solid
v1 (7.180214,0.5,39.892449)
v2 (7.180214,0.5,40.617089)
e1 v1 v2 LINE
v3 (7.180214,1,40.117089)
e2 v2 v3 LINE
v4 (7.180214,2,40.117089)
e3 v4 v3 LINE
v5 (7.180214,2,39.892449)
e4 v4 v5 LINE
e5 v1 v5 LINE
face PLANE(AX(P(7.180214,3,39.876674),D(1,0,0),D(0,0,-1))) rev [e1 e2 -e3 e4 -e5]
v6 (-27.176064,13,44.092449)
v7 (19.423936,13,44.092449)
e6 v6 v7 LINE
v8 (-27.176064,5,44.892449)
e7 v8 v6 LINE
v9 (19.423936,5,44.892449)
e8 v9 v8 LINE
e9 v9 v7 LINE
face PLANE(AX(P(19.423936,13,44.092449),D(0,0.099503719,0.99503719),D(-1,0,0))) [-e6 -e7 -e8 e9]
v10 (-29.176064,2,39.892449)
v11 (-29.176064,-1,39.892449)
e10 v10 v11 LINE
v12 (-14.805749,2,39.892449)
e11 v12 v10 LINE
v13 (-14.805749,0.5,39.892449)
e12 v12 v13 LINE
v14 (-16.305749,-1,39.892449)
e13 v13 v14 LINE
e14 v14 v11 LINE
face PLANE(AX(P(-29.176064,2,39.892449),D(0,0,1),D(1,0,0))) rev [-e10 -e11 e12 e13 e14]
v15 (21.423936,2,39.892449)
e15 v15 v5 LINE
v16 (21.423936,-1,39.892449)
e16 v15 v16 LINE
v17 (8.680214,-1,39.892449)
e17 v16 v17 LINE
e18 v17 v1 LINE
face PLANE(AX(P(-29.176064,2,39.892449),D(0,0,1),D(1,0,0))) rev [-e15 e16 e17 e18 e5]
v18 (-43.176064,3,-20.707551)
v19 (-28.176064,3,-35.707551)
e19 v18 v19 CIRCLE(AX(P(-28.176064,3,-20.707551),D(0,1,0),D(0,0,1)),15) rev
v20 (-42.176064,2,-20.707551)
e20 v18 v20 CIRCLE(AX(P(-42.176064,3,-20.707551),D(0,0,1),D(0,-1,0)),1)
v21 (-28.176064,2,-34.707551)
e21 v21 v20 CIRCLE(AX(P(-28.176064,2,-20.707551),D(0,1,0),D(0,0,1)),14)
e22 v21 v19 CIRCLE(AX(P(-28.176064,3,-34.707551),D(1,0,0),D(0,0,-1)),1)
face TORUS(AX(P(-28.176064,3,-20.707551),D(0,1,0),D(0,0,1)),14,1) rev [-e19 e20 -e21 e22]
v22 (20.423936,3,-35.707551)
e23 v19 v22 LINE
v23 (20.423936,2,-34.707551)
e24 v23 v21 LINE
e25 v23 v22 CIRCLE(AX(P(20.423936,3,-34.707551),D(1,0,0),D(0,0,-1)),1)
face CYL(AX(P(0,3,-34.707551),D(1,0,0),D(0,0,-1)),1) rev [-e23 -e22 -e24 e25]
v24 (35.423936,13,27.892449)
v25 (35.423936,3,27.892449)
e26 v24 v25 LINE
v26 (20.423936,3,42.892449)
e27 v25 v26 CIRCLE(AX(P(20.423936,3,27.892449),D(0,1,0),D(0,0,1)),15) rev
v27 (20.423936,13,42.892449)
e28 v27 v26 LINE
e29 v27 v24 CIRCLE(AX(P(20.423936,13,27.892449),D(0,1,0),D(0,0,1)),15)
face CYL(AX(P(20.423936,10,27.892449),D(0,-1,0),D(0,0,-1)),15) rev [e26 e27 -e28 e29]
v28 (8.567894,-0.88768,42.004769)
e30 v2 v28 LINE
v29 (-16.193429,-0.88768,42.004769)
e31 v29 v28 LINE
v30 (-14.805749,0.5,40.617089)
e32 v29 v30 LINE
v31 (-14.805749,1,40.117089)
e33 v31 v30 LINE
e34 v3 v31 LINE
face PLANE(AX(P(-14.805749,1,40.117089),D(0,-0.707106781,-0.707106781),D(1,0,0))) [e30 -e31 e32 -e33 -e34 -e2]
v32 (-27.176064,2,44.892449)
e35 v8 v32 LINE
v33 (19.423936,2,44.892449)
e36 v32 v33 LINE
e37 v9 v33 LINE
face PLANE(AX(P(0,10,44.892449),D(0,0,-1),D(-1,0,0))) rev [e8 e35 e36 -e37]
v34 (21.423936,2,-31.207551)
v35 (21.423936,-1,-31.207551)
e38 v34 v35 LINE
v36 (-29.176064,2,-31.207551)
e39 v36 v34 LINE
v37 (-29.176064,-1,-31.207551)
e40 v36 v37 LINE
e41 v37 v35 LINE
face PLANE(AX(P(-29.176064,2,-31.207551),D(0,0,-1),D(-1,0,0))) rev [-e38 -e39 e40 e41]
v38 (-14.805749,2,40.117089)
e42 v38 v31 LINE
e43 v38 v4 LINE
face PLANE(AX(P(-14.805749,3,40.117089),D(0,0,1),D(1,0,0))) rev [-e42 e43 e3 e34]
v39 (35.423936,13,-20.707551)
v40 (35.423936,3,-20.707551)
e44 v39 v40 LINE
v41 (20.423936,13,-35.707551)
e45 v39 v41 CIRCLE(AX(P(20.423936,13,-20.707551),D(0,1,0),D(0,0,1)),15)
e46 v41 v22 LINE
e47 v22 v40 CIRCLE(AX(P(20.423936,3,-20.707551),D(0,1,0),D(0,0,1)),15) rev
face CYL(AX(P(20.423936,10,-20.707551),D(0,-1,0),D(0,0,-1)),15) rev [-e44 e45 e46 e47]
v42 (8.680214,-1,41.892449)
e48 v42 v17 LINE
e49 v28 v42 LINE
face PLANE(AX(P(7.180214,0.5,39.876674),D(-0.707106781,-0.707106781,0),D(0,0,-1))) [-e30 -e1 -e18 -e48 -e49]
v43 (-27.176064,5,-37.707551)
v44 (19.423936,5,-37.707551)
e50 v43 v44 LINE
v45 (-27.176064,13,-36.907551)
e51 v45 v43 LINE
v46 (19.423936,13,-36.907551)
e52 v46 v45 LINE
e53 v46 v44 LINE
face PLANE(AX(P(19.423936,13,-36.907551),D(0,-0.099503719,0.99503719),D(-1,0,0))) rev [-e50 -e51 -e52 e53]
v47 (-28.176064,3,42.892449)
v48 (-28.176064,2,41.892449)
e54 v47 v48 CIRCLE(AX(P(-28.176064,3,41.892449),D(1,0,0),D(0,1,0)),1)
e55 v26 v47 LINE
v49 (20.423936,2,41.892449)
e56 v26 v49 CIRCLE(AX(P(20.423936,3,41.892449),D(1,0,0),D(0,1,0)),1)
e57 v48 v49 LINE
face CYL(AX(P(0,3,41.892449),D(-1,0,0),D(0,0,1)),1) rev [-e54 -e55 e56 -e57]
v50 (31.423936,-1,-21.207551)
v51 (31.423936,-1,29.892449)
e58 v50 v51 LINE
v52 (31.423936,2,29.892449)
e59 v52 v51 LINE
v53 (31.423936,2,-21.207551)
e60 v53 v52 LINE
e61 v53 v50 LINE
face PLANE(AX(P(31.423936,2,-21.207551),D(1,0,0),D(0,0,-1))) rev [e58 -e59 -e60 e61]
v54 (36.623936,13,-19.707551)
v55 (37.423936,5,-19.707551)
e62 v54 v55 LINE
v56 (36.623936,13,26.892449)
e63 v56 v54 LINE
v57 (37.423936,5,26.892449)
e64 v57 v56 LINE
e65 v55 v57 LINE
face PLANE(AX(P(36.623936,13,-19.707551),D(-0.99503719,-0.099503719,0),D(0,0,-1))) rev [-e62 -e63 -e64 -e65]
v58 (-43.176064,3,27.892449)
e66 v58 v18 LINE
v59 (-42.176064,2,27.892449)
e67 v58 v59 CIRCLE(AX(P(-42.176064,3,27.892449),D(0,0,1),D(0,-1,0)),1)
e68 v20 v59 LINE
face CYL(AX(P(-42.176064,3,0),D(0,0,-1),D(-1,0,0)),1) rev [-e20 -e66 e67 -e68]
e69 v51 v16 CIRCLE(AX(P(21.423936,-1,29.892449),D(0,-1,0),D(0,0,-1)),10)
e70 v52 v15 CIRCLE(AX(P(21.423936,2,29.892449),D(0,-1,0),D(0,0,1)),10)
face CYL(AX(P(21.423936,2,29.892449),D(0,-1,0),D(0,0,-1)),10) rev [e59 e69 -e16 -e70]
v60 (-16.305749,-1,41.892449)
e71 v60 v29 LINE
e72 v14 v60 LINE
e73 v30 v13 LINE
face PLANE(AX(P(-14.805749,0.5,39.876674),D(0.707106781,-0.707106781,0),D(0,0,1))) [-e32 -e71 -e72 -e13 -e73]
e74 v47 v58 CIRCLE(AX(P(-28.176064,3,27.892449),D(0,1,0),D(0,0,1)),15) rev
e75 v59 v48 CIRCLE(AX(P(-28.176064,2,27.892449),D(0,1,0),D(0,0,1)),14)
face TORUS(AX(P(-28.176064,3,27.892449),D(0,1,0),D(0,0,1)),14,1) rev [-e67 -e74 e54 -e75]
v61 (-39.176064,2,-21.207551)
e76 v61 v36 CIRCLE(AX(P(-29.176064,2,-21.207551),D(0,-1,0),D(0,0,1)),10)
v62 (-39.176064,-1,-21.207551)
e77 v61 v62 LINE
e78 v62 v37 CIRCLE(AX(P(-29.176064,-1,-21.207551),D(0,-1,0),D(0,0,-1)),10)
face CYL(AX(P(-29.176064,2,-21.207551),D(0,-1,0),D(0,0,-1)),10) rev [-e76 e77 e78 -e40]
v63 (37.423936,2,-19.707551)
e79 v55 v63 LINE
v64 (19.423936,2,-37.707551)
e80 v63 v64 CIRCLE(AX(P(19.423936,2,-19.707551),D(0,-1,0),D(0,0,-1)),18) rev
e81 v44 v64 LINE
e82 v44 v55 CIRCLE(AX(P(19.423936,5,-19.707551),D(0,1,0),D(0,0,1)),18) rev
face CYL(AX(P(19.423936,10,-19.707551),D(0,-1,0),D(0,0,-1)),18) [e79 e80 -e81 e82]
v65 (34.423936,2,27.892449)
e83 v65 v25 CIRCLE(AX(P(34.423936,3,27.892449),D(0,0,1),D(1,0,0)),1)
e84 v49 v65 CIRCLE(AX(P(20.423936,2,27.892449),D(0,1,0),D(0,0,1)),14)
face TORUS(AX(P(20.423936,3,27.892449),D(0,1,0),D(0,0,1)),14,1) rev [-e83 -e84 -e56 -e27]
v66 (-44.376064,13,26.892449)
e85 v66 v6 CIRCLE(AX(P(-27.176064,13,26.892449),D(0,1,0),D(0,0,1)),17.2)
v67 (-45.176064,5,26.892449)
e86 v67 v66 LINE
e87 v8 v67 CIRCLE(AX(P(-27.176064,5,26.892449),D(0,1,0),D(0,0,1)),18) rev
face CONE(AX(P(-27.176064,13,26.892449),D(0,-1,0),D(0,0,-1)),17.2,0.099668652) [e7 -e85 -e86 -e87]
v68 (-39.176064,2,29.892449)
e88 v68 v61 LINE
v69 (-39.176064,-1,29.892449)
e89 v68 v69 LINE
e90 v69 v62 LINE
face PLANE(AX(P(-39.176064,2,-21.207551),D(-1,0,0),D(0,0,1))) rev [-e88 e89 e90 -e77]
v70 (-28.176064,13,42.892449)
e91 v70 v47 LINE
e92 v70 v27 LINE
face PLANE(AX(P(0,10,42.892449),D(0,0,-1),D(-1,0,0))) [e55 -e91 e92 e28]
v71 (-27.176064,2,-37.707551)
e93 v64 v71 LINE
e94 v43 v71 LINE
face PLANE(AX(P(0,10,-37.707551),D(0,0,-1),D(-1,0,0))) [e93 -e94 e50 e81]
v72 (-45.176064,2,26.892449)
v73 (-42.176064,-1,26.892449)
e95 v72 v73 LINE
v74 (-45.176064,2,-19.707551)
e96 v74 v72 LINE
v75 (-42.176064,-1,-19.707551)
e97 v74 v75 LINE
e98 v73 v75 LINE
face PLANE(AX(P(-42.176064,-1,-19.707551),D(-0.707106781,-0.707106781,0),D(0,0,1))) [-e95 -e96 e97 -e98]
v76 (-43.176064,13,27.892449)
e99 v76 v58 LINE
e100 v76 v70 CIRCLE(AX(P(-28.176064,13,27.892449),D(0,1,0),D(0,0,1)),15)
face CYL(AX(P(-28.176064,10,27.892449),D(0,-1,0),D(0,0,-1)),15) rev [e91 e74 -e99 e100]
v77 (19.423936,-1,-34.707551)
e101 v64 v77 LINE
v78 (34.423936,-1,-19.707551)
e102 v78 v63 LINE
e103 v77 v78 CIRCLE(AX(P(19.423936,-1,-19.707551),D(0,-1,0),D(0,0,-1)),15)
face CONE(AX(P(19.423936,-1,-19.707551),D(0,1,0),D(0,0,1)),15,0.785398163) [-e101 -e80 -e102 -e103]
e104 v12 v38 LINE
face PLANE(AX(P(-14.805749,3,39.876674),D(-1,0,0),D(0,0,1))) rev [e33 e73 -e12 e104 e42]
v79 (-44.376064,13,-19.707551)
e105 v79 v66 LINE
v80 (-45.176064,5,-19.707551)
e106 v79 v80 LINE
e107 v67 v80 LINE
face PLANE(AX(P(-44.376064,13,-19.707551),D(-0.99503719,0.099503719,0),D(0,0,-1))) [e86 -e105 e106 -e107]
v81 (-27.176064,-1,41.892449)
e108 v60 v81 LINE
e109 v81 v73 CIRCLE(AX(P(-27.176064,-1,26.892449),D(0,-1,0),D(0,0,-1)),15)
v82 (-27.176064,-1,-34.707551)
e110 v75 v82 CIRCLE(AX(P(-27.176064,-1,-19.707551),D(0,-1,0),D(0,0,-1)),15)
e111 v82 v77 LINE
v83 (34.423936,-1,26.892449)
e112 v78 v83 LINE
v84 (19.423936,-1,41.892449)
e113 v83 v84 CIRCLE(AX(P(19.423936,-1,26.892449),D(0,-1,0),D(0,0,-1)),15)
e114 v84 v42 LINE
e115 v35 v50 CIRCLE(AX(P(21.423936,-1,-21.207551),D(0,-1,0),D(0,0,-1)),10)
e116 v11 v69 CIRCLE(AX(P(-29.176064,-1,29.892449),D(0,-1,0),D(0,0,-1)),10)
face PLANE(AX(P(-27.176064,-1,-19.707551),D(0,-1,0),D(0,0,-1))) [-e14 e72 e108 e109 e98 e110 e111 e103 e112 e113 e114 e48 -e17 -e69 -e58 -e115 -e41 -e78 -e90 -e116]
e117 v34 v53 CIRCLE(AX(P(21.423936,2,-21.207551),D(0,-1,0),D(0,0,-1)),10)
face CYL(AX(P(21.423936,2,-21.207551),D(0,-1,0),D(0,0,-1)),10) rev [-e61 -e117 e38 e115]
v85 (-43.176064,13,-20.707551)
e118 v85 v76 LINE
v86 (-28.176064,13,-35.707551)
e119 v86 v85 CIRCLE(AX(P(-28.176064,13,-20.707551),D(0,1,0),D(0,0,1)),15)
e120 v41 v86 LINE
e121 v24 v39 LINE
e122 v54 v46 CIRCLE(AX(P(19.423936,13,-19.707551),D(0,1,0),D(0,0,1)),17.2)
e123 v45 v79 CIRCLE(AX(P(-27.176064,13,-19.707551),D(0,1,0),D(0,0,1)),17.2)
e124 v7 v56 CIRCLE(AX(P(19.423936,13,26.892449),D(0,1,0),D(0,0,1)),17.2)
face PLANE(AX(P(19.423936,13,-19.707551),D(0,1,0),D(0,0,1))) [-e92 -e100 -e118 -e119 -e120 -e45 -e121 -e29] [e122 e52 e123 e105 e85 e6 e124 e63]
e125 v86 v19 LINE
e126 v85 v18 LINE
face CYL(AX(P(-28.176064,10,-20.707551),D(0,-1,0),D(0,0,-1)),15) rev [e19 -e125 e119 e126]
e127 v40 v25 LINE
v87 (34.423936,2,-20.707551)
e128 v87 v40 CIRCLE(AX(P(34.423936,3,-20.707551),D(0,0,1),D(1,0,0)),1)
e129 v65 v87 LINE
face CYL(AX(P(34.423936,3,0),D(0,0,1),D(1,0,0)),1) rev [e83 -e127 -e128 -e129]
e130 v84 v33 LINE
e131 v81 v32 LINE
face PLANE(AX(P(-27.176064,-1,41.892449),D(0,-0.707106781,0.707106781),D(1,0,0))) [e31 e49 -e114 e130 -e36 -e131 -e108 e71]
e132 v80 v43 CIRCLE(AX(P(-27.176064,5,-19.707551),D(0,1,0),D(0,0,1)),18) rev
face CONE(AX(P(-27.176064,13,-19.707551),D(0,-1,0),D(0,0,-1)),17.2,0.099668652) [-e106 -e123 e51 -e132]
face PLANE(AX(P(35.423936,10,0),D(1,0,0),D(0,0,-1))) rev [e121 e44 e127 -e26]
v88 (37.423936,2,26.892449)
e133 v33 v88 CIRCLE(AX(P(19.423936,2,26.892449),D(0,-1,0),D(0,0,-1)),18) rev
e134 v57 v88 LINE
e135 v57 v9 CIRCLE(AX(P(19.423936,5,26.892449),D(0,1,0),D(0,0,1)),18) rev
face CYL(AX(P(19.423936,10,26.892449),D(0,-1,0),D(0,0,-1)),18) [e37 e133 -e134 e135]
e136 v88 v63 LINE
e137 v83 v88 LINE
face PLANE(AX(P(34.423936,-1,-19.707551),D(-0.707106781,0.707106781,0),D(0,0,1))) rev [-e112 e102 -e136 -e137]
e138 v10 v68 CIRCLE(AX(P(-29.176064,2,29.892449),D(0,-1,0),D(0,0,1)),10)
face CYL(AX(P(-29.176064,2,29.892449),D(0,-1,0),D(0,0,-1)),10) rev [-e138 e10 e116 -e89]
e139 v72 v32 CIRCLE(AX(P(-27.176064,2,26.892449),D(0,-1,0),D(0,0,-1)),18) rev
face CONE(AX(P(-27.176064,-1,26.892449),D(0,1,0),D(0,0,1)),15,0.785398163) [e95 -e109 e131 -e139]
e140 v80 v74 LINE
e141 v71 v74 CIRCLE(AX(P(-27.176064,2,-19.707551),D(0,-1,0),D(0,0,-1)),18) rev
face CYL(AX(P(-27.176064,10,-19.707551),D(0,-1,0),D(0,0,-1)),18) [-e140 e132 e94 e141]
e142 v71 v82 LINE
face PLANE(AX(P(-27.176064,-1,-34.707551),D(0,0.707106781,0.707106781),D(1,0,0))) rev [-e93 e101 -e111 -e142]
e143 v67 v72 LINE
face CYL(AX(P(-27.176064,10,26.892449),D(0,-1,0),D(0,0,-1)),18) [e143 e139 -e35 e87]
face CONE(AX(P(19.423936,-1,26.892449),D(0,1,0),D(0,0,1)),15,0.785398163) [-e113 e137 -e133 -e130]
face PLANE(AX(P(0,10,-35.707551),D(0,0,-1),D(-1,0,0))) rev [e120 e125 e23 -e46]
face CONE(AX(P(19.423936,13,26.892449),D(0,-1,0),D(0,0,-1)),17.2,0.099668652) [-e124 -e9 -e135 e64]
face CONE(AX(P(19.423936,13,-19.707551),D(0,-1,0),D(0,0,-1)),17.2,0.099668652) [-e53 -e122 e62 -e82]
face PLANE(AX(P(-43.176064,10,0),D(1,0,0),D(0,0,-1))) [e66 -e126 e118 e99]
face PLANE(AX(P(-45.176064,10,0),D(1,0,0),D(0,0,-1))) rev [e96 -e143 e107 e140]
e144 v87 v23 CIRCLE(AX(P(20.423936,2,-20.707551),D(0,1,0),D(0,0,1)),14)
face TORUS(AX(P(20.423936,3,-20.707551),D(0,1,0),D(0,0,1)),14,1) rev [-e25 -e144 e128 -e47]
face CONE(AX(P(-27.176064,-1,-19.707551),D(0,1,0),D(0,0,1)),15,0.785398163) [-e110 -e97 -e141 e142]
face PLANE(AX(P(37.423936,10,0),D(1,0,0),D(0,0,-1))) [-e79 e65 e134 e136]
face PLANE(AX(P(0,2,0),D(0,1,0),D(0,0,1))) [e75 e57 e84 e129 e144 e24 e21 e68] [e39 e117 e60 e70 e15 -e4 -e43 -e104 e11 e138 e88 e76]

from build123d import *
from OCP.BRepFilletAPI import BRepFilletAPI_MakeChamfer

# Parameters (mm, degrees)
BOSS_EXTRUDE1_DEPTH = 10
BOSS_EXTRUDE2_DEPTH = 2
FILLET1_R           = 1
BOSS_EXTRUDE3_DEPTH = 3
CHAMFER2_SIZE       = 8
CHAMFER2_SIZE2      = 0.8
BOSS_EXTRUDE4_START = -2
BOSS_EXTRUDE4_DEPTH = 2
BOSS_EXTRUDE5_DEPTH = 1
CHAMFER3_SIZE       = 3
SKETCH6_W           = 21.985963637
SKETCH6_H           = 0.240414759
CUT_EXTRUDE1_DEPTH  = 4
CHAMFER4_SIZE       = 2
CHAMFER5_SIZE       = 1.5
CHAMFER6_SIZE       = 1.5


with BuildPart() as part:
    # Sketch1 → Boss-Extrude1 (new body)
    with BuildSketch(Plane(origin=(0, 0, 0), x_dir=(1, 0, 0), z_dir=(0, 1, 0))):
        with BuildLine():
            Line((-27.176063521, 37.707550883), (19.423936479, 37.707550883))
            ThreePointArc((19.423936479, 37.707550883), (32.151858541, 32.435472945), (37.423936479, 19.707550883))
            Line((37.423936479, 19.707550883), (37.423936479, -26.892449117))
            ThreePointArc((37.423936479, -26.892449117), (32.151858541, -39.620371178), (19.423936479, -44.892449117))
            Line((19.423936479, -44.892449117), (-27.176063521, -44.892449117))
            ThreePointArc((-27.176063521, -44.892449117), (-39.903985582, -39.620371178), (-45.176063521, -26.892449117))
            Line((-45.176063521, -26.892449117), (-45.176063521, 19.707550883))
            ThreePointArc((-45.176063521, 19.707550883), (-39.903985582, 32.435472945), (-27.176063521, 37.707550883))
        make_face()
        with BuildLine():
            ThreePointArc((-28.176063521, 35.707550883), (-38.782665238, 31.314152601), (-43.176063521, 20.707550883))
            Line((-43.176063521, 20.707550883), (-43.176063521, -27.892449117))
            ThreePointArc((-43.176063521, -27.892449117), (-38.782665238, -38.499050834), (-28.176063521, -42.892449117))
            Line((-28.176063521, -42.892449117), (20.423936479, -42.892449117))
            ThreePointArc((20.423936479, -42.892449117), (31.030538197, -38.499050834), (35.423936479, -27.892449117))
            Line((35.423936479, -27.892449117), (35.423936479, 20.707550883))
            ThreePointArc((35.423936479, 20.707550883), (31.030538197, 31.314152601), (20.423936479, 35.707550883))
            Line((20.423936479, 35.707550883), (-28.176063521, 35.707550883))
        make_face(mode=Mode.SUBTRACT)
    extrude(amount=BOSS_EXTRUDE1_DEPTH)

    # Sketch1<3> → Boss-Extrude2 (add)
    with BuildSketch(Plane(origin=(0, 0, 0), x_dir=(1, 0, 0), z_dir=(0, 1, 0))):
        with BuildLine():
            Line((-28.176063521, 35.707550883), (20.423936479, 35.707550883))
            ThreePointArc((20.423936479, 35.707550883), (31.030538197, 31.314152601), (35.423936479, 20.707550883))
            Line((35.423936479, 20.707550883), (35.423936479, -27.892449117))
            ThreePointArc((35.423936479, -27.892449117), (31.030538197, -38.499050834), (20.423936479, -42.892449117))
            Line((20.423936479, -42.892449117), (-28.176063521, -42.892449117))
            ThreePointArc((-28.176063521, -42.892449117), (-38.782665238, -38.499050834), (-43.176063521, -27.892449117))
            Line((-43.176063521, -27.892449117), (-43.176063521, 20.707550883))
            ThreePointArc((-43.176063521, 20.707550883), (-38.782665238, 31.314152601), (-28.176063521, 35.707550883))
        make_face()
        with BuildLine():
            ThreePointArc((-30.176063521, 33.707550883), (-37.954238114, 30.485725476), (-41.176063521, 22.707550883))
            Line((-41.176063521, 22.707550883), (-41.176063521, -29.892449117))
            ThreePointArc((-41.176063521, -29.892449117), (-37.954238114, -37.67062371), (-30.176063521, -40.892449117))
            Line((-30.176063521, -40.892449117), (22.423936479, -40.892449117))
            ThreePointArc((22.423936479, -40.892449117), (30.202111072, -37.67062371), (33.423936479, -29.892449117))
            Line((33.423936479, -29.892449117), (33.423936479, 22.707550883))
            ThreePointArc((33.423936479, 22.707550883), (30.202111072, 30.485725476), (22.423936479, 33.707550883))
            Line((22.423936479, 33.707550883), (-30.176063521, 33.707550883))
        make_face(mode=Mode.SUBTRACT)
    extrude(amount=BOSS_EXTRUDE2_DEPTH)

    # Fillet1
    fillet1_edges = [part.edges().sort_by_distance(p)[0] for p in [
        (-3.876063521, 2, -35.707550883),
        (35.423936479, 2, 3.592449117),
        (31.030538197, 2, -31.314152601),
        (-38.782665238, 2, -31.314152601),
        (-43.176063521, 2, 3.592449117),
        (-38.782665238, 2, 38.499050834),
        (-3.876063521, 2, 42.892449117),
        (31.030538197, 2, 38.499050834),
    ]]
    fillet(fillet1_edges, radius=FILLET1_R)

    # Sketch2 → Boss-Extrude3 (add)
    with BuildSketch(Plane(origin=(0, 10, 0), x_dir=(1, 0, 0), z_dir=(0, 1, 0))):
        with BuildLine():
            Line((19.423936479, 37.707550883), (-27.176063521, 37.707550883))
            ThreePointArc((-27.176063521, 37.707550883), (-39.903985582, 32.435472945), (-45.176063521, 19.707550883))
            Line((-45.176063521, 19.707550883), (-45.176063521, -26.892449117))
            ThreePointArc((-45.176063521, -26.892449117), (-39.903985582, -39.620371178), (-27.176063521, -44.892449117))
            Line((-27.176063521, -44.892449117), (19.423936479, -44.892449117))
            ThreePointArc((19.423936479, -44.892449117), (32.151858541, -39.620371178), (37.423936479, -26.892449117))
            Line((37.423936479, -26.892449117), (37.423936479, 19.707550883))
            ThreePointArc((37.423936479, 19.707550883), (32.151858541, 32.435472945), (19.423936479, 37.707550883))
        make_face()
        with BuildLine():
            Line((-28.176063521, 35.707550883), (20.423936479, 35.707550883))
            ThreePointArc((20.423936479, 35.707550883), (31.030538197, 31.314152601), (35.423936479, 20.707550883))
            Line((35.423936479, 20.707550883), (35.423936479, -27.892449117))
            ThreePointArc((35.423936479, -27.892449117), (31.030538197, -38.499050834), (20.423936479, -42.892449117))
            Line((20.423936479, -42.892449117), (-28.176063521, -42.892449117))
            ThreePointArc((-28.176063521, -42.892449117), (-38.782665238, -38.499050834), (-43.176063521, -27.892449117))
            Line((-43.176063521, -27.892449117), (-43.176063521, 20.707550883))
            ThreePointArc((-43.176063521, 20.707550883), (-38.782665238, 31.314152601), (-28.176063521, 35.707550883))
        make_face(mode=Mode.SUBTRACT)
    extrude(amount=BOSS_EXTRUDE3_DEPTH)

    # Chamfer2: one chamfer whose edges measure the first distance from different faces: ONE call of the kernel's chamfer builder (chamfer() names one face for all edges)
    chamfer2_edges_1 = [part.edges().sort_by_distance(p)[0] for p in [
        (32.151858541, 13, -32.435472945),
    ]]
    chamfer2_side_1 = [part.faces().sort_by_distance(p)[0] for p in [
        (32.151858541, 6.5, -32.435472945),
    ]]
    chamfer2_edges_2 = [part.edges().sort_by_distance(p)[0] for p in [
        (-3.876063521, 13, -37.707550883),
    ]]
    chamfer2_side_2 = [part.faces().sort_by_distance(p)[0] for p in [
        (-3.876063521, 6.5, -37.707550883),
    ]]
    chamfer2_edges_3 = [part.edges().sort_by_distance(p)[0] for p in [
        (-39.903985582, 13, -32.435472945),
    ]]
    chamfer2_side_3 = [part.faces().sort_by_distance(p)[0] for p in [
        (-39.903985582, 6.5, -32.435472945),
    ]]
    chamfer2_edges_4 = [part.edges().sort_by_distance(p)[0] for p in [
        (-45.176063521, 13, 3.592449117),
    ]]
    chamfer2_side_4 = [part.faces().sort_by_distance(p)[0] for p in [
        (-45.176063521, 6.5, 3.592449117),
    ]]
    chamfer2_edges_5 = [part.edges().sort_by_distance(p)[0] for p in [
        (-39.903985582, 13, 39.620371178),
    ]]
    chamfer2_side_5 = [part.faces().sort_by_distance(p)[0] for p in [
        (-39.903985582, 6.5, 39.620371178),
    ]]
    chamfer2_edges_6 = [part.edges().sort_by_distance(p)[0] for p in [
        (-3.876063521, 13, 44.892449117),
    ]]
    chamfer2_side_6 = [part.faces().sort_by_distance(p)[0] for p in [
        (-3.876063521, 6.5, 44.892449117),
    ]]
    chamfer2_edges_7 = [part.edges().sort_by_distance(p)[0] for p in [
        (32.151858541, 13, 39.620371178),
    ]]
    chamfer2_side_7 = [part.faces().sort_by_distance(p)[0] for p in [
        (32.151858541, 6.5, 39.620371178),
    ]]
    chamfer2_edges_8 = [part.edges().sort_by_distance(p)[0] for p in [
        (37.423936479, 13, 3.592449117),
    ]]
    chamfer2_side_8 = [part.faces().sort_by_distance(p)[0] for p in [
        (37.423936479, 6.5, 3.592449117),
    ]]
    chamfer2 = BRepFilletAPI_MakeChamfer(part.part.solid().wrapped)
    for e in chamfer2_edges_1:
        chamfer2.Add(CHAMFER2_SIZE, CHAMFER2_SIZE2, e.wrapped, chamfer2_side_1[0].wrapped)  # the first distance lies on this face
    for e in chamfer2_edges_2:
        chamfer2.Add(CHAMFER2_SIZE, CHAMFER2_SIZE2, e.wrapped, chamfer2_side_2[0].wrapped)  # the first distance lies on this face
    for e in chamfer2_edges_3:
        chamfer2.Add(CHAMFER2_SIZE, CHAMFER2_SIZE2, e.wrapped, chamfer2_side_3[0].wrapped)  # the first distance lies on this face
    for e in chamfer2_edges_4:
        chamfer2.Add(CHAMFER2_SIZE, CHAMFER2_SIZE2, e.wrapped, chamfer2_side_4[0].wrapped)  # the first distance lies on this face
    for e in chamfer2_edges_5:
        chamfer2.Add(CHAMFER2_SIZE, CHAMFER2_SIZE2, e.wrapped, chamfer2_side_5[0].wrapped)  # the first distance lies on this face
    for e in chamfer2_edges_6:
        chamfer2.Add(CHAMFER2_SIZE, CHAMFER2_SIZE2, e.wrapped, chamfer2_side_6[0].wrapped)  # the first distance lies on this face
    for e in chamfer2_edges_7:
        chamfer2.Add(CHAMFER2_SIZE, CHAMFER2_SIZE2, e.wrapped, chamfer2_side_7[0].wrapped)  # the first distance lies on this face
    for e in chamfer2_edges_8:
        chamfer2.Add(CHAMFER2_SIZE, CHAMFER2_SIZE2, e.wrapped, chamfer2_side_8[0].wrapped)  # the first distance lies on this face
    add(Compound.cast(chamfer2.Shape()), mode=Mode.REPLACE)

    # Sketch3 → Boss-Extrude4 (add)
    with BuildSketch(Plane.XZ.offset(BOSS_EXTRUDE4_START)):
        with BuildLine():
            Line((-30.176063521, -33.707550883), (22.423936479, -33.707550883))
            ThreePointArc((22.423936479, -33.707550883), (30.202111072, -30.485725476), (33.423936479, -22.707550883))
            Line((33.423936479, -22.707550883), (33.423936479, 29.892449117))
            ThreePointArc((33.423936479, 29.892449117), (30.202111072, 37.67062371), (22.423936479, 40.892449117))
            Line((22.423936479, 40.892449117), (-30.176063521, 40.892449117))
            ThreePointArc((-30.176063521, 40.892449117), (-37.954238114, 37.67062371), (-41.176063521, 29.892449117))
            Line((-41.176063521, 29.892449117), (-41.176063521, -22.707550883))
            ThreePointArc((-41.176063521, -22.707550883), (-37.954238114, -30.485725476), (-30.176063521, -33.707550883))
        make_face()
        with BuildLine():
            Line((-29.176063521, -31.207550883), (21.423936479, -31.207550883))
            ThreePointArc((21.423936479, -31.207550883), (28.495004291, -28.278618695), (31.423936479, -21.207550883))
            Line((31.423936479, -21.207550883), (31.423936479, 29.892449117))
            ThreePointArc((31.423936479, 29.892449117), (28.495004291, 36.963516928), (21.423936479, 39.892449117))
            Line((21.423936479, 39.892449117), (-29.176063521, 39.892449117))
            ThreePointArc((-29.176063521, 39.892449117), (-36.247131332, 36.963516928), (-39.176063521, 29.892449117))
            Line((-39.176063521, 29.892449117), (-39.176063521, -21.207550883))
            ThreePointArc((-39.176063521, -21.207550883), (-36.247131332, -28.278618695), (-29.176063521, -31.207550883))
        make_face(mode=Mode.SUBTRACT)
    extrude(amount=BOSS_EXTRUDE4_DEPTH)

    # Sketch5 → Boss-Extrude5 (add)
    with BuildSketch(Plane.XZ):
        with BuildLine():
            Line((-27.176063521, -37.707550883), (19.423936479, -37.707550883))
            ThreePointArc((19.423936479, -37.707550883), (32.151858541, -32.435472945), (37.423936479, -19.707550883))
            Line((37.423936479, -19.707550883), (37.423936479, 26.892449117))
            ThreePointArc((37.423936479, 26.892449117), (32.151858541, 39.620371178), (19.423936479, 44.892449117))
            Line((19.423936479, 44.892449117), (-27.176063521, 44.892449117))
            ThreePointArc((-27.176063521, 44.892449117), (-39.903985582, 39.620371178), (-45.176063521, 26.892449117))
            Line((-45.176063521, 26.892449117), (-45.176063521, -19.707550883))
            ThreePointArc((-45.176063521, -19.707550883), (-39.903985582, -32.435472945), (-27.176063521, -37.707550883))
        make_face()
        with BuildLine():
            Line((-39.176063521, 29.892449117), (-39.176063521, -21.207550883))
            ThreePointArc((-39.176063521, -21.207550883), (-36.247131332, -28.278618695), (-29.176063521, -31.207550883))
            Line((-29.176063521, -31.207550883), (21.423936479, -31.207550883))
            ThreePointArc((21.423936479, -31.207550883), (28.495004291, -28.278618695), (31.423936479, -21.207550883))
            Line((31.423936479, -21.207550883), (31.423936479, 29.892449117))
            ThreePointArc((31.423936479, 29.892449117), (28.495004291, 36.963516928), (21.423936479, 39.892449117))
            Line((21.423936479, 39.892449117), (-29.176063521, 39.892449117))
            ThreePointArc((-29.176063521, 39.892449117), (-36.247131332, 36.963516928), (-39.176063521, 29.892449117))
        make_face(mode=Mode.SUBTRACT)
    extrude(amount=BOSS_EXTRUDE5_DEPTH)

    # Chamfer3
    chamfer3_edges = [part.edges().sort_by_distance(p)[0] for p in [
        (-39.903985582, -1, -32.435472945),
        (-3.876063521, -1, -37.707550883),
        (32.151858541, -1, -32.435472945),
        (37.423936479, -1, 3.592449117),
        (32.151858541, -1, 39.620371178),
        (-3.876063521, -1, 44.892449117),
        (-39.903985582, -1, 39.620371178),
        (-45.176063521, -1, 3.592449117),
    ]]
    chamfer(chamfer3_edges, length=CHAMFER3_SIZE)

    # Sketch6 → Cut-Extrude1 (cut)
    with BuildSketch(Plane.XZ.offset(1)):
        with Locations((-3.812767506, 39.996881837)):
            Rectangle(SKETCH6_W, SKETCH6_H)
    extrude(amount=-CUT_EXTRUDE1_DEPTH, mode=Mode.SUBTRACT)

    # Chamfer4
    # the kernel refuses this chamfer: 2 mm, written as the material it takes off along each edge
    with BuildSketch(Plane(origin=(7.180214313, -1, 40.117089217), x_dir=(0, -0.027495876610586403, 0.9996219169112968), z_dir=(-1, 0, 0))) as chamfer4_piece_1:
        Polygon((CHAMFER4_SIZE * 0.999621916911, CHAMFER4_SIZE * 0.0274958766106), (-CHAMFER4_SIZE * 0.0274958766106, CHAMFER4_SIZE * 0.999621916911), (0, 0), align=None)
    extrude(amount=21.985963637, mode=Mode.SUBTRACT)

    # Chamfer5
    chamfer5_edges = [part.edges().sort_by_distance(p)[0] for p in [
        (7.180214313, -1, 40.892449117),
    ]]
    chamfer(chamfer5_edges, length=CHAMFER5_SIZE)

    # Chamfer6
    chamfer6_edges = [part.edges().sort_by_distance(p)[0] for p in [
        (-14.805749324, -1, 40.892449117),
    ]]
    chamfer(chamfer6_edges, length=CHAMFER6_SIZE)


solid = part.part
